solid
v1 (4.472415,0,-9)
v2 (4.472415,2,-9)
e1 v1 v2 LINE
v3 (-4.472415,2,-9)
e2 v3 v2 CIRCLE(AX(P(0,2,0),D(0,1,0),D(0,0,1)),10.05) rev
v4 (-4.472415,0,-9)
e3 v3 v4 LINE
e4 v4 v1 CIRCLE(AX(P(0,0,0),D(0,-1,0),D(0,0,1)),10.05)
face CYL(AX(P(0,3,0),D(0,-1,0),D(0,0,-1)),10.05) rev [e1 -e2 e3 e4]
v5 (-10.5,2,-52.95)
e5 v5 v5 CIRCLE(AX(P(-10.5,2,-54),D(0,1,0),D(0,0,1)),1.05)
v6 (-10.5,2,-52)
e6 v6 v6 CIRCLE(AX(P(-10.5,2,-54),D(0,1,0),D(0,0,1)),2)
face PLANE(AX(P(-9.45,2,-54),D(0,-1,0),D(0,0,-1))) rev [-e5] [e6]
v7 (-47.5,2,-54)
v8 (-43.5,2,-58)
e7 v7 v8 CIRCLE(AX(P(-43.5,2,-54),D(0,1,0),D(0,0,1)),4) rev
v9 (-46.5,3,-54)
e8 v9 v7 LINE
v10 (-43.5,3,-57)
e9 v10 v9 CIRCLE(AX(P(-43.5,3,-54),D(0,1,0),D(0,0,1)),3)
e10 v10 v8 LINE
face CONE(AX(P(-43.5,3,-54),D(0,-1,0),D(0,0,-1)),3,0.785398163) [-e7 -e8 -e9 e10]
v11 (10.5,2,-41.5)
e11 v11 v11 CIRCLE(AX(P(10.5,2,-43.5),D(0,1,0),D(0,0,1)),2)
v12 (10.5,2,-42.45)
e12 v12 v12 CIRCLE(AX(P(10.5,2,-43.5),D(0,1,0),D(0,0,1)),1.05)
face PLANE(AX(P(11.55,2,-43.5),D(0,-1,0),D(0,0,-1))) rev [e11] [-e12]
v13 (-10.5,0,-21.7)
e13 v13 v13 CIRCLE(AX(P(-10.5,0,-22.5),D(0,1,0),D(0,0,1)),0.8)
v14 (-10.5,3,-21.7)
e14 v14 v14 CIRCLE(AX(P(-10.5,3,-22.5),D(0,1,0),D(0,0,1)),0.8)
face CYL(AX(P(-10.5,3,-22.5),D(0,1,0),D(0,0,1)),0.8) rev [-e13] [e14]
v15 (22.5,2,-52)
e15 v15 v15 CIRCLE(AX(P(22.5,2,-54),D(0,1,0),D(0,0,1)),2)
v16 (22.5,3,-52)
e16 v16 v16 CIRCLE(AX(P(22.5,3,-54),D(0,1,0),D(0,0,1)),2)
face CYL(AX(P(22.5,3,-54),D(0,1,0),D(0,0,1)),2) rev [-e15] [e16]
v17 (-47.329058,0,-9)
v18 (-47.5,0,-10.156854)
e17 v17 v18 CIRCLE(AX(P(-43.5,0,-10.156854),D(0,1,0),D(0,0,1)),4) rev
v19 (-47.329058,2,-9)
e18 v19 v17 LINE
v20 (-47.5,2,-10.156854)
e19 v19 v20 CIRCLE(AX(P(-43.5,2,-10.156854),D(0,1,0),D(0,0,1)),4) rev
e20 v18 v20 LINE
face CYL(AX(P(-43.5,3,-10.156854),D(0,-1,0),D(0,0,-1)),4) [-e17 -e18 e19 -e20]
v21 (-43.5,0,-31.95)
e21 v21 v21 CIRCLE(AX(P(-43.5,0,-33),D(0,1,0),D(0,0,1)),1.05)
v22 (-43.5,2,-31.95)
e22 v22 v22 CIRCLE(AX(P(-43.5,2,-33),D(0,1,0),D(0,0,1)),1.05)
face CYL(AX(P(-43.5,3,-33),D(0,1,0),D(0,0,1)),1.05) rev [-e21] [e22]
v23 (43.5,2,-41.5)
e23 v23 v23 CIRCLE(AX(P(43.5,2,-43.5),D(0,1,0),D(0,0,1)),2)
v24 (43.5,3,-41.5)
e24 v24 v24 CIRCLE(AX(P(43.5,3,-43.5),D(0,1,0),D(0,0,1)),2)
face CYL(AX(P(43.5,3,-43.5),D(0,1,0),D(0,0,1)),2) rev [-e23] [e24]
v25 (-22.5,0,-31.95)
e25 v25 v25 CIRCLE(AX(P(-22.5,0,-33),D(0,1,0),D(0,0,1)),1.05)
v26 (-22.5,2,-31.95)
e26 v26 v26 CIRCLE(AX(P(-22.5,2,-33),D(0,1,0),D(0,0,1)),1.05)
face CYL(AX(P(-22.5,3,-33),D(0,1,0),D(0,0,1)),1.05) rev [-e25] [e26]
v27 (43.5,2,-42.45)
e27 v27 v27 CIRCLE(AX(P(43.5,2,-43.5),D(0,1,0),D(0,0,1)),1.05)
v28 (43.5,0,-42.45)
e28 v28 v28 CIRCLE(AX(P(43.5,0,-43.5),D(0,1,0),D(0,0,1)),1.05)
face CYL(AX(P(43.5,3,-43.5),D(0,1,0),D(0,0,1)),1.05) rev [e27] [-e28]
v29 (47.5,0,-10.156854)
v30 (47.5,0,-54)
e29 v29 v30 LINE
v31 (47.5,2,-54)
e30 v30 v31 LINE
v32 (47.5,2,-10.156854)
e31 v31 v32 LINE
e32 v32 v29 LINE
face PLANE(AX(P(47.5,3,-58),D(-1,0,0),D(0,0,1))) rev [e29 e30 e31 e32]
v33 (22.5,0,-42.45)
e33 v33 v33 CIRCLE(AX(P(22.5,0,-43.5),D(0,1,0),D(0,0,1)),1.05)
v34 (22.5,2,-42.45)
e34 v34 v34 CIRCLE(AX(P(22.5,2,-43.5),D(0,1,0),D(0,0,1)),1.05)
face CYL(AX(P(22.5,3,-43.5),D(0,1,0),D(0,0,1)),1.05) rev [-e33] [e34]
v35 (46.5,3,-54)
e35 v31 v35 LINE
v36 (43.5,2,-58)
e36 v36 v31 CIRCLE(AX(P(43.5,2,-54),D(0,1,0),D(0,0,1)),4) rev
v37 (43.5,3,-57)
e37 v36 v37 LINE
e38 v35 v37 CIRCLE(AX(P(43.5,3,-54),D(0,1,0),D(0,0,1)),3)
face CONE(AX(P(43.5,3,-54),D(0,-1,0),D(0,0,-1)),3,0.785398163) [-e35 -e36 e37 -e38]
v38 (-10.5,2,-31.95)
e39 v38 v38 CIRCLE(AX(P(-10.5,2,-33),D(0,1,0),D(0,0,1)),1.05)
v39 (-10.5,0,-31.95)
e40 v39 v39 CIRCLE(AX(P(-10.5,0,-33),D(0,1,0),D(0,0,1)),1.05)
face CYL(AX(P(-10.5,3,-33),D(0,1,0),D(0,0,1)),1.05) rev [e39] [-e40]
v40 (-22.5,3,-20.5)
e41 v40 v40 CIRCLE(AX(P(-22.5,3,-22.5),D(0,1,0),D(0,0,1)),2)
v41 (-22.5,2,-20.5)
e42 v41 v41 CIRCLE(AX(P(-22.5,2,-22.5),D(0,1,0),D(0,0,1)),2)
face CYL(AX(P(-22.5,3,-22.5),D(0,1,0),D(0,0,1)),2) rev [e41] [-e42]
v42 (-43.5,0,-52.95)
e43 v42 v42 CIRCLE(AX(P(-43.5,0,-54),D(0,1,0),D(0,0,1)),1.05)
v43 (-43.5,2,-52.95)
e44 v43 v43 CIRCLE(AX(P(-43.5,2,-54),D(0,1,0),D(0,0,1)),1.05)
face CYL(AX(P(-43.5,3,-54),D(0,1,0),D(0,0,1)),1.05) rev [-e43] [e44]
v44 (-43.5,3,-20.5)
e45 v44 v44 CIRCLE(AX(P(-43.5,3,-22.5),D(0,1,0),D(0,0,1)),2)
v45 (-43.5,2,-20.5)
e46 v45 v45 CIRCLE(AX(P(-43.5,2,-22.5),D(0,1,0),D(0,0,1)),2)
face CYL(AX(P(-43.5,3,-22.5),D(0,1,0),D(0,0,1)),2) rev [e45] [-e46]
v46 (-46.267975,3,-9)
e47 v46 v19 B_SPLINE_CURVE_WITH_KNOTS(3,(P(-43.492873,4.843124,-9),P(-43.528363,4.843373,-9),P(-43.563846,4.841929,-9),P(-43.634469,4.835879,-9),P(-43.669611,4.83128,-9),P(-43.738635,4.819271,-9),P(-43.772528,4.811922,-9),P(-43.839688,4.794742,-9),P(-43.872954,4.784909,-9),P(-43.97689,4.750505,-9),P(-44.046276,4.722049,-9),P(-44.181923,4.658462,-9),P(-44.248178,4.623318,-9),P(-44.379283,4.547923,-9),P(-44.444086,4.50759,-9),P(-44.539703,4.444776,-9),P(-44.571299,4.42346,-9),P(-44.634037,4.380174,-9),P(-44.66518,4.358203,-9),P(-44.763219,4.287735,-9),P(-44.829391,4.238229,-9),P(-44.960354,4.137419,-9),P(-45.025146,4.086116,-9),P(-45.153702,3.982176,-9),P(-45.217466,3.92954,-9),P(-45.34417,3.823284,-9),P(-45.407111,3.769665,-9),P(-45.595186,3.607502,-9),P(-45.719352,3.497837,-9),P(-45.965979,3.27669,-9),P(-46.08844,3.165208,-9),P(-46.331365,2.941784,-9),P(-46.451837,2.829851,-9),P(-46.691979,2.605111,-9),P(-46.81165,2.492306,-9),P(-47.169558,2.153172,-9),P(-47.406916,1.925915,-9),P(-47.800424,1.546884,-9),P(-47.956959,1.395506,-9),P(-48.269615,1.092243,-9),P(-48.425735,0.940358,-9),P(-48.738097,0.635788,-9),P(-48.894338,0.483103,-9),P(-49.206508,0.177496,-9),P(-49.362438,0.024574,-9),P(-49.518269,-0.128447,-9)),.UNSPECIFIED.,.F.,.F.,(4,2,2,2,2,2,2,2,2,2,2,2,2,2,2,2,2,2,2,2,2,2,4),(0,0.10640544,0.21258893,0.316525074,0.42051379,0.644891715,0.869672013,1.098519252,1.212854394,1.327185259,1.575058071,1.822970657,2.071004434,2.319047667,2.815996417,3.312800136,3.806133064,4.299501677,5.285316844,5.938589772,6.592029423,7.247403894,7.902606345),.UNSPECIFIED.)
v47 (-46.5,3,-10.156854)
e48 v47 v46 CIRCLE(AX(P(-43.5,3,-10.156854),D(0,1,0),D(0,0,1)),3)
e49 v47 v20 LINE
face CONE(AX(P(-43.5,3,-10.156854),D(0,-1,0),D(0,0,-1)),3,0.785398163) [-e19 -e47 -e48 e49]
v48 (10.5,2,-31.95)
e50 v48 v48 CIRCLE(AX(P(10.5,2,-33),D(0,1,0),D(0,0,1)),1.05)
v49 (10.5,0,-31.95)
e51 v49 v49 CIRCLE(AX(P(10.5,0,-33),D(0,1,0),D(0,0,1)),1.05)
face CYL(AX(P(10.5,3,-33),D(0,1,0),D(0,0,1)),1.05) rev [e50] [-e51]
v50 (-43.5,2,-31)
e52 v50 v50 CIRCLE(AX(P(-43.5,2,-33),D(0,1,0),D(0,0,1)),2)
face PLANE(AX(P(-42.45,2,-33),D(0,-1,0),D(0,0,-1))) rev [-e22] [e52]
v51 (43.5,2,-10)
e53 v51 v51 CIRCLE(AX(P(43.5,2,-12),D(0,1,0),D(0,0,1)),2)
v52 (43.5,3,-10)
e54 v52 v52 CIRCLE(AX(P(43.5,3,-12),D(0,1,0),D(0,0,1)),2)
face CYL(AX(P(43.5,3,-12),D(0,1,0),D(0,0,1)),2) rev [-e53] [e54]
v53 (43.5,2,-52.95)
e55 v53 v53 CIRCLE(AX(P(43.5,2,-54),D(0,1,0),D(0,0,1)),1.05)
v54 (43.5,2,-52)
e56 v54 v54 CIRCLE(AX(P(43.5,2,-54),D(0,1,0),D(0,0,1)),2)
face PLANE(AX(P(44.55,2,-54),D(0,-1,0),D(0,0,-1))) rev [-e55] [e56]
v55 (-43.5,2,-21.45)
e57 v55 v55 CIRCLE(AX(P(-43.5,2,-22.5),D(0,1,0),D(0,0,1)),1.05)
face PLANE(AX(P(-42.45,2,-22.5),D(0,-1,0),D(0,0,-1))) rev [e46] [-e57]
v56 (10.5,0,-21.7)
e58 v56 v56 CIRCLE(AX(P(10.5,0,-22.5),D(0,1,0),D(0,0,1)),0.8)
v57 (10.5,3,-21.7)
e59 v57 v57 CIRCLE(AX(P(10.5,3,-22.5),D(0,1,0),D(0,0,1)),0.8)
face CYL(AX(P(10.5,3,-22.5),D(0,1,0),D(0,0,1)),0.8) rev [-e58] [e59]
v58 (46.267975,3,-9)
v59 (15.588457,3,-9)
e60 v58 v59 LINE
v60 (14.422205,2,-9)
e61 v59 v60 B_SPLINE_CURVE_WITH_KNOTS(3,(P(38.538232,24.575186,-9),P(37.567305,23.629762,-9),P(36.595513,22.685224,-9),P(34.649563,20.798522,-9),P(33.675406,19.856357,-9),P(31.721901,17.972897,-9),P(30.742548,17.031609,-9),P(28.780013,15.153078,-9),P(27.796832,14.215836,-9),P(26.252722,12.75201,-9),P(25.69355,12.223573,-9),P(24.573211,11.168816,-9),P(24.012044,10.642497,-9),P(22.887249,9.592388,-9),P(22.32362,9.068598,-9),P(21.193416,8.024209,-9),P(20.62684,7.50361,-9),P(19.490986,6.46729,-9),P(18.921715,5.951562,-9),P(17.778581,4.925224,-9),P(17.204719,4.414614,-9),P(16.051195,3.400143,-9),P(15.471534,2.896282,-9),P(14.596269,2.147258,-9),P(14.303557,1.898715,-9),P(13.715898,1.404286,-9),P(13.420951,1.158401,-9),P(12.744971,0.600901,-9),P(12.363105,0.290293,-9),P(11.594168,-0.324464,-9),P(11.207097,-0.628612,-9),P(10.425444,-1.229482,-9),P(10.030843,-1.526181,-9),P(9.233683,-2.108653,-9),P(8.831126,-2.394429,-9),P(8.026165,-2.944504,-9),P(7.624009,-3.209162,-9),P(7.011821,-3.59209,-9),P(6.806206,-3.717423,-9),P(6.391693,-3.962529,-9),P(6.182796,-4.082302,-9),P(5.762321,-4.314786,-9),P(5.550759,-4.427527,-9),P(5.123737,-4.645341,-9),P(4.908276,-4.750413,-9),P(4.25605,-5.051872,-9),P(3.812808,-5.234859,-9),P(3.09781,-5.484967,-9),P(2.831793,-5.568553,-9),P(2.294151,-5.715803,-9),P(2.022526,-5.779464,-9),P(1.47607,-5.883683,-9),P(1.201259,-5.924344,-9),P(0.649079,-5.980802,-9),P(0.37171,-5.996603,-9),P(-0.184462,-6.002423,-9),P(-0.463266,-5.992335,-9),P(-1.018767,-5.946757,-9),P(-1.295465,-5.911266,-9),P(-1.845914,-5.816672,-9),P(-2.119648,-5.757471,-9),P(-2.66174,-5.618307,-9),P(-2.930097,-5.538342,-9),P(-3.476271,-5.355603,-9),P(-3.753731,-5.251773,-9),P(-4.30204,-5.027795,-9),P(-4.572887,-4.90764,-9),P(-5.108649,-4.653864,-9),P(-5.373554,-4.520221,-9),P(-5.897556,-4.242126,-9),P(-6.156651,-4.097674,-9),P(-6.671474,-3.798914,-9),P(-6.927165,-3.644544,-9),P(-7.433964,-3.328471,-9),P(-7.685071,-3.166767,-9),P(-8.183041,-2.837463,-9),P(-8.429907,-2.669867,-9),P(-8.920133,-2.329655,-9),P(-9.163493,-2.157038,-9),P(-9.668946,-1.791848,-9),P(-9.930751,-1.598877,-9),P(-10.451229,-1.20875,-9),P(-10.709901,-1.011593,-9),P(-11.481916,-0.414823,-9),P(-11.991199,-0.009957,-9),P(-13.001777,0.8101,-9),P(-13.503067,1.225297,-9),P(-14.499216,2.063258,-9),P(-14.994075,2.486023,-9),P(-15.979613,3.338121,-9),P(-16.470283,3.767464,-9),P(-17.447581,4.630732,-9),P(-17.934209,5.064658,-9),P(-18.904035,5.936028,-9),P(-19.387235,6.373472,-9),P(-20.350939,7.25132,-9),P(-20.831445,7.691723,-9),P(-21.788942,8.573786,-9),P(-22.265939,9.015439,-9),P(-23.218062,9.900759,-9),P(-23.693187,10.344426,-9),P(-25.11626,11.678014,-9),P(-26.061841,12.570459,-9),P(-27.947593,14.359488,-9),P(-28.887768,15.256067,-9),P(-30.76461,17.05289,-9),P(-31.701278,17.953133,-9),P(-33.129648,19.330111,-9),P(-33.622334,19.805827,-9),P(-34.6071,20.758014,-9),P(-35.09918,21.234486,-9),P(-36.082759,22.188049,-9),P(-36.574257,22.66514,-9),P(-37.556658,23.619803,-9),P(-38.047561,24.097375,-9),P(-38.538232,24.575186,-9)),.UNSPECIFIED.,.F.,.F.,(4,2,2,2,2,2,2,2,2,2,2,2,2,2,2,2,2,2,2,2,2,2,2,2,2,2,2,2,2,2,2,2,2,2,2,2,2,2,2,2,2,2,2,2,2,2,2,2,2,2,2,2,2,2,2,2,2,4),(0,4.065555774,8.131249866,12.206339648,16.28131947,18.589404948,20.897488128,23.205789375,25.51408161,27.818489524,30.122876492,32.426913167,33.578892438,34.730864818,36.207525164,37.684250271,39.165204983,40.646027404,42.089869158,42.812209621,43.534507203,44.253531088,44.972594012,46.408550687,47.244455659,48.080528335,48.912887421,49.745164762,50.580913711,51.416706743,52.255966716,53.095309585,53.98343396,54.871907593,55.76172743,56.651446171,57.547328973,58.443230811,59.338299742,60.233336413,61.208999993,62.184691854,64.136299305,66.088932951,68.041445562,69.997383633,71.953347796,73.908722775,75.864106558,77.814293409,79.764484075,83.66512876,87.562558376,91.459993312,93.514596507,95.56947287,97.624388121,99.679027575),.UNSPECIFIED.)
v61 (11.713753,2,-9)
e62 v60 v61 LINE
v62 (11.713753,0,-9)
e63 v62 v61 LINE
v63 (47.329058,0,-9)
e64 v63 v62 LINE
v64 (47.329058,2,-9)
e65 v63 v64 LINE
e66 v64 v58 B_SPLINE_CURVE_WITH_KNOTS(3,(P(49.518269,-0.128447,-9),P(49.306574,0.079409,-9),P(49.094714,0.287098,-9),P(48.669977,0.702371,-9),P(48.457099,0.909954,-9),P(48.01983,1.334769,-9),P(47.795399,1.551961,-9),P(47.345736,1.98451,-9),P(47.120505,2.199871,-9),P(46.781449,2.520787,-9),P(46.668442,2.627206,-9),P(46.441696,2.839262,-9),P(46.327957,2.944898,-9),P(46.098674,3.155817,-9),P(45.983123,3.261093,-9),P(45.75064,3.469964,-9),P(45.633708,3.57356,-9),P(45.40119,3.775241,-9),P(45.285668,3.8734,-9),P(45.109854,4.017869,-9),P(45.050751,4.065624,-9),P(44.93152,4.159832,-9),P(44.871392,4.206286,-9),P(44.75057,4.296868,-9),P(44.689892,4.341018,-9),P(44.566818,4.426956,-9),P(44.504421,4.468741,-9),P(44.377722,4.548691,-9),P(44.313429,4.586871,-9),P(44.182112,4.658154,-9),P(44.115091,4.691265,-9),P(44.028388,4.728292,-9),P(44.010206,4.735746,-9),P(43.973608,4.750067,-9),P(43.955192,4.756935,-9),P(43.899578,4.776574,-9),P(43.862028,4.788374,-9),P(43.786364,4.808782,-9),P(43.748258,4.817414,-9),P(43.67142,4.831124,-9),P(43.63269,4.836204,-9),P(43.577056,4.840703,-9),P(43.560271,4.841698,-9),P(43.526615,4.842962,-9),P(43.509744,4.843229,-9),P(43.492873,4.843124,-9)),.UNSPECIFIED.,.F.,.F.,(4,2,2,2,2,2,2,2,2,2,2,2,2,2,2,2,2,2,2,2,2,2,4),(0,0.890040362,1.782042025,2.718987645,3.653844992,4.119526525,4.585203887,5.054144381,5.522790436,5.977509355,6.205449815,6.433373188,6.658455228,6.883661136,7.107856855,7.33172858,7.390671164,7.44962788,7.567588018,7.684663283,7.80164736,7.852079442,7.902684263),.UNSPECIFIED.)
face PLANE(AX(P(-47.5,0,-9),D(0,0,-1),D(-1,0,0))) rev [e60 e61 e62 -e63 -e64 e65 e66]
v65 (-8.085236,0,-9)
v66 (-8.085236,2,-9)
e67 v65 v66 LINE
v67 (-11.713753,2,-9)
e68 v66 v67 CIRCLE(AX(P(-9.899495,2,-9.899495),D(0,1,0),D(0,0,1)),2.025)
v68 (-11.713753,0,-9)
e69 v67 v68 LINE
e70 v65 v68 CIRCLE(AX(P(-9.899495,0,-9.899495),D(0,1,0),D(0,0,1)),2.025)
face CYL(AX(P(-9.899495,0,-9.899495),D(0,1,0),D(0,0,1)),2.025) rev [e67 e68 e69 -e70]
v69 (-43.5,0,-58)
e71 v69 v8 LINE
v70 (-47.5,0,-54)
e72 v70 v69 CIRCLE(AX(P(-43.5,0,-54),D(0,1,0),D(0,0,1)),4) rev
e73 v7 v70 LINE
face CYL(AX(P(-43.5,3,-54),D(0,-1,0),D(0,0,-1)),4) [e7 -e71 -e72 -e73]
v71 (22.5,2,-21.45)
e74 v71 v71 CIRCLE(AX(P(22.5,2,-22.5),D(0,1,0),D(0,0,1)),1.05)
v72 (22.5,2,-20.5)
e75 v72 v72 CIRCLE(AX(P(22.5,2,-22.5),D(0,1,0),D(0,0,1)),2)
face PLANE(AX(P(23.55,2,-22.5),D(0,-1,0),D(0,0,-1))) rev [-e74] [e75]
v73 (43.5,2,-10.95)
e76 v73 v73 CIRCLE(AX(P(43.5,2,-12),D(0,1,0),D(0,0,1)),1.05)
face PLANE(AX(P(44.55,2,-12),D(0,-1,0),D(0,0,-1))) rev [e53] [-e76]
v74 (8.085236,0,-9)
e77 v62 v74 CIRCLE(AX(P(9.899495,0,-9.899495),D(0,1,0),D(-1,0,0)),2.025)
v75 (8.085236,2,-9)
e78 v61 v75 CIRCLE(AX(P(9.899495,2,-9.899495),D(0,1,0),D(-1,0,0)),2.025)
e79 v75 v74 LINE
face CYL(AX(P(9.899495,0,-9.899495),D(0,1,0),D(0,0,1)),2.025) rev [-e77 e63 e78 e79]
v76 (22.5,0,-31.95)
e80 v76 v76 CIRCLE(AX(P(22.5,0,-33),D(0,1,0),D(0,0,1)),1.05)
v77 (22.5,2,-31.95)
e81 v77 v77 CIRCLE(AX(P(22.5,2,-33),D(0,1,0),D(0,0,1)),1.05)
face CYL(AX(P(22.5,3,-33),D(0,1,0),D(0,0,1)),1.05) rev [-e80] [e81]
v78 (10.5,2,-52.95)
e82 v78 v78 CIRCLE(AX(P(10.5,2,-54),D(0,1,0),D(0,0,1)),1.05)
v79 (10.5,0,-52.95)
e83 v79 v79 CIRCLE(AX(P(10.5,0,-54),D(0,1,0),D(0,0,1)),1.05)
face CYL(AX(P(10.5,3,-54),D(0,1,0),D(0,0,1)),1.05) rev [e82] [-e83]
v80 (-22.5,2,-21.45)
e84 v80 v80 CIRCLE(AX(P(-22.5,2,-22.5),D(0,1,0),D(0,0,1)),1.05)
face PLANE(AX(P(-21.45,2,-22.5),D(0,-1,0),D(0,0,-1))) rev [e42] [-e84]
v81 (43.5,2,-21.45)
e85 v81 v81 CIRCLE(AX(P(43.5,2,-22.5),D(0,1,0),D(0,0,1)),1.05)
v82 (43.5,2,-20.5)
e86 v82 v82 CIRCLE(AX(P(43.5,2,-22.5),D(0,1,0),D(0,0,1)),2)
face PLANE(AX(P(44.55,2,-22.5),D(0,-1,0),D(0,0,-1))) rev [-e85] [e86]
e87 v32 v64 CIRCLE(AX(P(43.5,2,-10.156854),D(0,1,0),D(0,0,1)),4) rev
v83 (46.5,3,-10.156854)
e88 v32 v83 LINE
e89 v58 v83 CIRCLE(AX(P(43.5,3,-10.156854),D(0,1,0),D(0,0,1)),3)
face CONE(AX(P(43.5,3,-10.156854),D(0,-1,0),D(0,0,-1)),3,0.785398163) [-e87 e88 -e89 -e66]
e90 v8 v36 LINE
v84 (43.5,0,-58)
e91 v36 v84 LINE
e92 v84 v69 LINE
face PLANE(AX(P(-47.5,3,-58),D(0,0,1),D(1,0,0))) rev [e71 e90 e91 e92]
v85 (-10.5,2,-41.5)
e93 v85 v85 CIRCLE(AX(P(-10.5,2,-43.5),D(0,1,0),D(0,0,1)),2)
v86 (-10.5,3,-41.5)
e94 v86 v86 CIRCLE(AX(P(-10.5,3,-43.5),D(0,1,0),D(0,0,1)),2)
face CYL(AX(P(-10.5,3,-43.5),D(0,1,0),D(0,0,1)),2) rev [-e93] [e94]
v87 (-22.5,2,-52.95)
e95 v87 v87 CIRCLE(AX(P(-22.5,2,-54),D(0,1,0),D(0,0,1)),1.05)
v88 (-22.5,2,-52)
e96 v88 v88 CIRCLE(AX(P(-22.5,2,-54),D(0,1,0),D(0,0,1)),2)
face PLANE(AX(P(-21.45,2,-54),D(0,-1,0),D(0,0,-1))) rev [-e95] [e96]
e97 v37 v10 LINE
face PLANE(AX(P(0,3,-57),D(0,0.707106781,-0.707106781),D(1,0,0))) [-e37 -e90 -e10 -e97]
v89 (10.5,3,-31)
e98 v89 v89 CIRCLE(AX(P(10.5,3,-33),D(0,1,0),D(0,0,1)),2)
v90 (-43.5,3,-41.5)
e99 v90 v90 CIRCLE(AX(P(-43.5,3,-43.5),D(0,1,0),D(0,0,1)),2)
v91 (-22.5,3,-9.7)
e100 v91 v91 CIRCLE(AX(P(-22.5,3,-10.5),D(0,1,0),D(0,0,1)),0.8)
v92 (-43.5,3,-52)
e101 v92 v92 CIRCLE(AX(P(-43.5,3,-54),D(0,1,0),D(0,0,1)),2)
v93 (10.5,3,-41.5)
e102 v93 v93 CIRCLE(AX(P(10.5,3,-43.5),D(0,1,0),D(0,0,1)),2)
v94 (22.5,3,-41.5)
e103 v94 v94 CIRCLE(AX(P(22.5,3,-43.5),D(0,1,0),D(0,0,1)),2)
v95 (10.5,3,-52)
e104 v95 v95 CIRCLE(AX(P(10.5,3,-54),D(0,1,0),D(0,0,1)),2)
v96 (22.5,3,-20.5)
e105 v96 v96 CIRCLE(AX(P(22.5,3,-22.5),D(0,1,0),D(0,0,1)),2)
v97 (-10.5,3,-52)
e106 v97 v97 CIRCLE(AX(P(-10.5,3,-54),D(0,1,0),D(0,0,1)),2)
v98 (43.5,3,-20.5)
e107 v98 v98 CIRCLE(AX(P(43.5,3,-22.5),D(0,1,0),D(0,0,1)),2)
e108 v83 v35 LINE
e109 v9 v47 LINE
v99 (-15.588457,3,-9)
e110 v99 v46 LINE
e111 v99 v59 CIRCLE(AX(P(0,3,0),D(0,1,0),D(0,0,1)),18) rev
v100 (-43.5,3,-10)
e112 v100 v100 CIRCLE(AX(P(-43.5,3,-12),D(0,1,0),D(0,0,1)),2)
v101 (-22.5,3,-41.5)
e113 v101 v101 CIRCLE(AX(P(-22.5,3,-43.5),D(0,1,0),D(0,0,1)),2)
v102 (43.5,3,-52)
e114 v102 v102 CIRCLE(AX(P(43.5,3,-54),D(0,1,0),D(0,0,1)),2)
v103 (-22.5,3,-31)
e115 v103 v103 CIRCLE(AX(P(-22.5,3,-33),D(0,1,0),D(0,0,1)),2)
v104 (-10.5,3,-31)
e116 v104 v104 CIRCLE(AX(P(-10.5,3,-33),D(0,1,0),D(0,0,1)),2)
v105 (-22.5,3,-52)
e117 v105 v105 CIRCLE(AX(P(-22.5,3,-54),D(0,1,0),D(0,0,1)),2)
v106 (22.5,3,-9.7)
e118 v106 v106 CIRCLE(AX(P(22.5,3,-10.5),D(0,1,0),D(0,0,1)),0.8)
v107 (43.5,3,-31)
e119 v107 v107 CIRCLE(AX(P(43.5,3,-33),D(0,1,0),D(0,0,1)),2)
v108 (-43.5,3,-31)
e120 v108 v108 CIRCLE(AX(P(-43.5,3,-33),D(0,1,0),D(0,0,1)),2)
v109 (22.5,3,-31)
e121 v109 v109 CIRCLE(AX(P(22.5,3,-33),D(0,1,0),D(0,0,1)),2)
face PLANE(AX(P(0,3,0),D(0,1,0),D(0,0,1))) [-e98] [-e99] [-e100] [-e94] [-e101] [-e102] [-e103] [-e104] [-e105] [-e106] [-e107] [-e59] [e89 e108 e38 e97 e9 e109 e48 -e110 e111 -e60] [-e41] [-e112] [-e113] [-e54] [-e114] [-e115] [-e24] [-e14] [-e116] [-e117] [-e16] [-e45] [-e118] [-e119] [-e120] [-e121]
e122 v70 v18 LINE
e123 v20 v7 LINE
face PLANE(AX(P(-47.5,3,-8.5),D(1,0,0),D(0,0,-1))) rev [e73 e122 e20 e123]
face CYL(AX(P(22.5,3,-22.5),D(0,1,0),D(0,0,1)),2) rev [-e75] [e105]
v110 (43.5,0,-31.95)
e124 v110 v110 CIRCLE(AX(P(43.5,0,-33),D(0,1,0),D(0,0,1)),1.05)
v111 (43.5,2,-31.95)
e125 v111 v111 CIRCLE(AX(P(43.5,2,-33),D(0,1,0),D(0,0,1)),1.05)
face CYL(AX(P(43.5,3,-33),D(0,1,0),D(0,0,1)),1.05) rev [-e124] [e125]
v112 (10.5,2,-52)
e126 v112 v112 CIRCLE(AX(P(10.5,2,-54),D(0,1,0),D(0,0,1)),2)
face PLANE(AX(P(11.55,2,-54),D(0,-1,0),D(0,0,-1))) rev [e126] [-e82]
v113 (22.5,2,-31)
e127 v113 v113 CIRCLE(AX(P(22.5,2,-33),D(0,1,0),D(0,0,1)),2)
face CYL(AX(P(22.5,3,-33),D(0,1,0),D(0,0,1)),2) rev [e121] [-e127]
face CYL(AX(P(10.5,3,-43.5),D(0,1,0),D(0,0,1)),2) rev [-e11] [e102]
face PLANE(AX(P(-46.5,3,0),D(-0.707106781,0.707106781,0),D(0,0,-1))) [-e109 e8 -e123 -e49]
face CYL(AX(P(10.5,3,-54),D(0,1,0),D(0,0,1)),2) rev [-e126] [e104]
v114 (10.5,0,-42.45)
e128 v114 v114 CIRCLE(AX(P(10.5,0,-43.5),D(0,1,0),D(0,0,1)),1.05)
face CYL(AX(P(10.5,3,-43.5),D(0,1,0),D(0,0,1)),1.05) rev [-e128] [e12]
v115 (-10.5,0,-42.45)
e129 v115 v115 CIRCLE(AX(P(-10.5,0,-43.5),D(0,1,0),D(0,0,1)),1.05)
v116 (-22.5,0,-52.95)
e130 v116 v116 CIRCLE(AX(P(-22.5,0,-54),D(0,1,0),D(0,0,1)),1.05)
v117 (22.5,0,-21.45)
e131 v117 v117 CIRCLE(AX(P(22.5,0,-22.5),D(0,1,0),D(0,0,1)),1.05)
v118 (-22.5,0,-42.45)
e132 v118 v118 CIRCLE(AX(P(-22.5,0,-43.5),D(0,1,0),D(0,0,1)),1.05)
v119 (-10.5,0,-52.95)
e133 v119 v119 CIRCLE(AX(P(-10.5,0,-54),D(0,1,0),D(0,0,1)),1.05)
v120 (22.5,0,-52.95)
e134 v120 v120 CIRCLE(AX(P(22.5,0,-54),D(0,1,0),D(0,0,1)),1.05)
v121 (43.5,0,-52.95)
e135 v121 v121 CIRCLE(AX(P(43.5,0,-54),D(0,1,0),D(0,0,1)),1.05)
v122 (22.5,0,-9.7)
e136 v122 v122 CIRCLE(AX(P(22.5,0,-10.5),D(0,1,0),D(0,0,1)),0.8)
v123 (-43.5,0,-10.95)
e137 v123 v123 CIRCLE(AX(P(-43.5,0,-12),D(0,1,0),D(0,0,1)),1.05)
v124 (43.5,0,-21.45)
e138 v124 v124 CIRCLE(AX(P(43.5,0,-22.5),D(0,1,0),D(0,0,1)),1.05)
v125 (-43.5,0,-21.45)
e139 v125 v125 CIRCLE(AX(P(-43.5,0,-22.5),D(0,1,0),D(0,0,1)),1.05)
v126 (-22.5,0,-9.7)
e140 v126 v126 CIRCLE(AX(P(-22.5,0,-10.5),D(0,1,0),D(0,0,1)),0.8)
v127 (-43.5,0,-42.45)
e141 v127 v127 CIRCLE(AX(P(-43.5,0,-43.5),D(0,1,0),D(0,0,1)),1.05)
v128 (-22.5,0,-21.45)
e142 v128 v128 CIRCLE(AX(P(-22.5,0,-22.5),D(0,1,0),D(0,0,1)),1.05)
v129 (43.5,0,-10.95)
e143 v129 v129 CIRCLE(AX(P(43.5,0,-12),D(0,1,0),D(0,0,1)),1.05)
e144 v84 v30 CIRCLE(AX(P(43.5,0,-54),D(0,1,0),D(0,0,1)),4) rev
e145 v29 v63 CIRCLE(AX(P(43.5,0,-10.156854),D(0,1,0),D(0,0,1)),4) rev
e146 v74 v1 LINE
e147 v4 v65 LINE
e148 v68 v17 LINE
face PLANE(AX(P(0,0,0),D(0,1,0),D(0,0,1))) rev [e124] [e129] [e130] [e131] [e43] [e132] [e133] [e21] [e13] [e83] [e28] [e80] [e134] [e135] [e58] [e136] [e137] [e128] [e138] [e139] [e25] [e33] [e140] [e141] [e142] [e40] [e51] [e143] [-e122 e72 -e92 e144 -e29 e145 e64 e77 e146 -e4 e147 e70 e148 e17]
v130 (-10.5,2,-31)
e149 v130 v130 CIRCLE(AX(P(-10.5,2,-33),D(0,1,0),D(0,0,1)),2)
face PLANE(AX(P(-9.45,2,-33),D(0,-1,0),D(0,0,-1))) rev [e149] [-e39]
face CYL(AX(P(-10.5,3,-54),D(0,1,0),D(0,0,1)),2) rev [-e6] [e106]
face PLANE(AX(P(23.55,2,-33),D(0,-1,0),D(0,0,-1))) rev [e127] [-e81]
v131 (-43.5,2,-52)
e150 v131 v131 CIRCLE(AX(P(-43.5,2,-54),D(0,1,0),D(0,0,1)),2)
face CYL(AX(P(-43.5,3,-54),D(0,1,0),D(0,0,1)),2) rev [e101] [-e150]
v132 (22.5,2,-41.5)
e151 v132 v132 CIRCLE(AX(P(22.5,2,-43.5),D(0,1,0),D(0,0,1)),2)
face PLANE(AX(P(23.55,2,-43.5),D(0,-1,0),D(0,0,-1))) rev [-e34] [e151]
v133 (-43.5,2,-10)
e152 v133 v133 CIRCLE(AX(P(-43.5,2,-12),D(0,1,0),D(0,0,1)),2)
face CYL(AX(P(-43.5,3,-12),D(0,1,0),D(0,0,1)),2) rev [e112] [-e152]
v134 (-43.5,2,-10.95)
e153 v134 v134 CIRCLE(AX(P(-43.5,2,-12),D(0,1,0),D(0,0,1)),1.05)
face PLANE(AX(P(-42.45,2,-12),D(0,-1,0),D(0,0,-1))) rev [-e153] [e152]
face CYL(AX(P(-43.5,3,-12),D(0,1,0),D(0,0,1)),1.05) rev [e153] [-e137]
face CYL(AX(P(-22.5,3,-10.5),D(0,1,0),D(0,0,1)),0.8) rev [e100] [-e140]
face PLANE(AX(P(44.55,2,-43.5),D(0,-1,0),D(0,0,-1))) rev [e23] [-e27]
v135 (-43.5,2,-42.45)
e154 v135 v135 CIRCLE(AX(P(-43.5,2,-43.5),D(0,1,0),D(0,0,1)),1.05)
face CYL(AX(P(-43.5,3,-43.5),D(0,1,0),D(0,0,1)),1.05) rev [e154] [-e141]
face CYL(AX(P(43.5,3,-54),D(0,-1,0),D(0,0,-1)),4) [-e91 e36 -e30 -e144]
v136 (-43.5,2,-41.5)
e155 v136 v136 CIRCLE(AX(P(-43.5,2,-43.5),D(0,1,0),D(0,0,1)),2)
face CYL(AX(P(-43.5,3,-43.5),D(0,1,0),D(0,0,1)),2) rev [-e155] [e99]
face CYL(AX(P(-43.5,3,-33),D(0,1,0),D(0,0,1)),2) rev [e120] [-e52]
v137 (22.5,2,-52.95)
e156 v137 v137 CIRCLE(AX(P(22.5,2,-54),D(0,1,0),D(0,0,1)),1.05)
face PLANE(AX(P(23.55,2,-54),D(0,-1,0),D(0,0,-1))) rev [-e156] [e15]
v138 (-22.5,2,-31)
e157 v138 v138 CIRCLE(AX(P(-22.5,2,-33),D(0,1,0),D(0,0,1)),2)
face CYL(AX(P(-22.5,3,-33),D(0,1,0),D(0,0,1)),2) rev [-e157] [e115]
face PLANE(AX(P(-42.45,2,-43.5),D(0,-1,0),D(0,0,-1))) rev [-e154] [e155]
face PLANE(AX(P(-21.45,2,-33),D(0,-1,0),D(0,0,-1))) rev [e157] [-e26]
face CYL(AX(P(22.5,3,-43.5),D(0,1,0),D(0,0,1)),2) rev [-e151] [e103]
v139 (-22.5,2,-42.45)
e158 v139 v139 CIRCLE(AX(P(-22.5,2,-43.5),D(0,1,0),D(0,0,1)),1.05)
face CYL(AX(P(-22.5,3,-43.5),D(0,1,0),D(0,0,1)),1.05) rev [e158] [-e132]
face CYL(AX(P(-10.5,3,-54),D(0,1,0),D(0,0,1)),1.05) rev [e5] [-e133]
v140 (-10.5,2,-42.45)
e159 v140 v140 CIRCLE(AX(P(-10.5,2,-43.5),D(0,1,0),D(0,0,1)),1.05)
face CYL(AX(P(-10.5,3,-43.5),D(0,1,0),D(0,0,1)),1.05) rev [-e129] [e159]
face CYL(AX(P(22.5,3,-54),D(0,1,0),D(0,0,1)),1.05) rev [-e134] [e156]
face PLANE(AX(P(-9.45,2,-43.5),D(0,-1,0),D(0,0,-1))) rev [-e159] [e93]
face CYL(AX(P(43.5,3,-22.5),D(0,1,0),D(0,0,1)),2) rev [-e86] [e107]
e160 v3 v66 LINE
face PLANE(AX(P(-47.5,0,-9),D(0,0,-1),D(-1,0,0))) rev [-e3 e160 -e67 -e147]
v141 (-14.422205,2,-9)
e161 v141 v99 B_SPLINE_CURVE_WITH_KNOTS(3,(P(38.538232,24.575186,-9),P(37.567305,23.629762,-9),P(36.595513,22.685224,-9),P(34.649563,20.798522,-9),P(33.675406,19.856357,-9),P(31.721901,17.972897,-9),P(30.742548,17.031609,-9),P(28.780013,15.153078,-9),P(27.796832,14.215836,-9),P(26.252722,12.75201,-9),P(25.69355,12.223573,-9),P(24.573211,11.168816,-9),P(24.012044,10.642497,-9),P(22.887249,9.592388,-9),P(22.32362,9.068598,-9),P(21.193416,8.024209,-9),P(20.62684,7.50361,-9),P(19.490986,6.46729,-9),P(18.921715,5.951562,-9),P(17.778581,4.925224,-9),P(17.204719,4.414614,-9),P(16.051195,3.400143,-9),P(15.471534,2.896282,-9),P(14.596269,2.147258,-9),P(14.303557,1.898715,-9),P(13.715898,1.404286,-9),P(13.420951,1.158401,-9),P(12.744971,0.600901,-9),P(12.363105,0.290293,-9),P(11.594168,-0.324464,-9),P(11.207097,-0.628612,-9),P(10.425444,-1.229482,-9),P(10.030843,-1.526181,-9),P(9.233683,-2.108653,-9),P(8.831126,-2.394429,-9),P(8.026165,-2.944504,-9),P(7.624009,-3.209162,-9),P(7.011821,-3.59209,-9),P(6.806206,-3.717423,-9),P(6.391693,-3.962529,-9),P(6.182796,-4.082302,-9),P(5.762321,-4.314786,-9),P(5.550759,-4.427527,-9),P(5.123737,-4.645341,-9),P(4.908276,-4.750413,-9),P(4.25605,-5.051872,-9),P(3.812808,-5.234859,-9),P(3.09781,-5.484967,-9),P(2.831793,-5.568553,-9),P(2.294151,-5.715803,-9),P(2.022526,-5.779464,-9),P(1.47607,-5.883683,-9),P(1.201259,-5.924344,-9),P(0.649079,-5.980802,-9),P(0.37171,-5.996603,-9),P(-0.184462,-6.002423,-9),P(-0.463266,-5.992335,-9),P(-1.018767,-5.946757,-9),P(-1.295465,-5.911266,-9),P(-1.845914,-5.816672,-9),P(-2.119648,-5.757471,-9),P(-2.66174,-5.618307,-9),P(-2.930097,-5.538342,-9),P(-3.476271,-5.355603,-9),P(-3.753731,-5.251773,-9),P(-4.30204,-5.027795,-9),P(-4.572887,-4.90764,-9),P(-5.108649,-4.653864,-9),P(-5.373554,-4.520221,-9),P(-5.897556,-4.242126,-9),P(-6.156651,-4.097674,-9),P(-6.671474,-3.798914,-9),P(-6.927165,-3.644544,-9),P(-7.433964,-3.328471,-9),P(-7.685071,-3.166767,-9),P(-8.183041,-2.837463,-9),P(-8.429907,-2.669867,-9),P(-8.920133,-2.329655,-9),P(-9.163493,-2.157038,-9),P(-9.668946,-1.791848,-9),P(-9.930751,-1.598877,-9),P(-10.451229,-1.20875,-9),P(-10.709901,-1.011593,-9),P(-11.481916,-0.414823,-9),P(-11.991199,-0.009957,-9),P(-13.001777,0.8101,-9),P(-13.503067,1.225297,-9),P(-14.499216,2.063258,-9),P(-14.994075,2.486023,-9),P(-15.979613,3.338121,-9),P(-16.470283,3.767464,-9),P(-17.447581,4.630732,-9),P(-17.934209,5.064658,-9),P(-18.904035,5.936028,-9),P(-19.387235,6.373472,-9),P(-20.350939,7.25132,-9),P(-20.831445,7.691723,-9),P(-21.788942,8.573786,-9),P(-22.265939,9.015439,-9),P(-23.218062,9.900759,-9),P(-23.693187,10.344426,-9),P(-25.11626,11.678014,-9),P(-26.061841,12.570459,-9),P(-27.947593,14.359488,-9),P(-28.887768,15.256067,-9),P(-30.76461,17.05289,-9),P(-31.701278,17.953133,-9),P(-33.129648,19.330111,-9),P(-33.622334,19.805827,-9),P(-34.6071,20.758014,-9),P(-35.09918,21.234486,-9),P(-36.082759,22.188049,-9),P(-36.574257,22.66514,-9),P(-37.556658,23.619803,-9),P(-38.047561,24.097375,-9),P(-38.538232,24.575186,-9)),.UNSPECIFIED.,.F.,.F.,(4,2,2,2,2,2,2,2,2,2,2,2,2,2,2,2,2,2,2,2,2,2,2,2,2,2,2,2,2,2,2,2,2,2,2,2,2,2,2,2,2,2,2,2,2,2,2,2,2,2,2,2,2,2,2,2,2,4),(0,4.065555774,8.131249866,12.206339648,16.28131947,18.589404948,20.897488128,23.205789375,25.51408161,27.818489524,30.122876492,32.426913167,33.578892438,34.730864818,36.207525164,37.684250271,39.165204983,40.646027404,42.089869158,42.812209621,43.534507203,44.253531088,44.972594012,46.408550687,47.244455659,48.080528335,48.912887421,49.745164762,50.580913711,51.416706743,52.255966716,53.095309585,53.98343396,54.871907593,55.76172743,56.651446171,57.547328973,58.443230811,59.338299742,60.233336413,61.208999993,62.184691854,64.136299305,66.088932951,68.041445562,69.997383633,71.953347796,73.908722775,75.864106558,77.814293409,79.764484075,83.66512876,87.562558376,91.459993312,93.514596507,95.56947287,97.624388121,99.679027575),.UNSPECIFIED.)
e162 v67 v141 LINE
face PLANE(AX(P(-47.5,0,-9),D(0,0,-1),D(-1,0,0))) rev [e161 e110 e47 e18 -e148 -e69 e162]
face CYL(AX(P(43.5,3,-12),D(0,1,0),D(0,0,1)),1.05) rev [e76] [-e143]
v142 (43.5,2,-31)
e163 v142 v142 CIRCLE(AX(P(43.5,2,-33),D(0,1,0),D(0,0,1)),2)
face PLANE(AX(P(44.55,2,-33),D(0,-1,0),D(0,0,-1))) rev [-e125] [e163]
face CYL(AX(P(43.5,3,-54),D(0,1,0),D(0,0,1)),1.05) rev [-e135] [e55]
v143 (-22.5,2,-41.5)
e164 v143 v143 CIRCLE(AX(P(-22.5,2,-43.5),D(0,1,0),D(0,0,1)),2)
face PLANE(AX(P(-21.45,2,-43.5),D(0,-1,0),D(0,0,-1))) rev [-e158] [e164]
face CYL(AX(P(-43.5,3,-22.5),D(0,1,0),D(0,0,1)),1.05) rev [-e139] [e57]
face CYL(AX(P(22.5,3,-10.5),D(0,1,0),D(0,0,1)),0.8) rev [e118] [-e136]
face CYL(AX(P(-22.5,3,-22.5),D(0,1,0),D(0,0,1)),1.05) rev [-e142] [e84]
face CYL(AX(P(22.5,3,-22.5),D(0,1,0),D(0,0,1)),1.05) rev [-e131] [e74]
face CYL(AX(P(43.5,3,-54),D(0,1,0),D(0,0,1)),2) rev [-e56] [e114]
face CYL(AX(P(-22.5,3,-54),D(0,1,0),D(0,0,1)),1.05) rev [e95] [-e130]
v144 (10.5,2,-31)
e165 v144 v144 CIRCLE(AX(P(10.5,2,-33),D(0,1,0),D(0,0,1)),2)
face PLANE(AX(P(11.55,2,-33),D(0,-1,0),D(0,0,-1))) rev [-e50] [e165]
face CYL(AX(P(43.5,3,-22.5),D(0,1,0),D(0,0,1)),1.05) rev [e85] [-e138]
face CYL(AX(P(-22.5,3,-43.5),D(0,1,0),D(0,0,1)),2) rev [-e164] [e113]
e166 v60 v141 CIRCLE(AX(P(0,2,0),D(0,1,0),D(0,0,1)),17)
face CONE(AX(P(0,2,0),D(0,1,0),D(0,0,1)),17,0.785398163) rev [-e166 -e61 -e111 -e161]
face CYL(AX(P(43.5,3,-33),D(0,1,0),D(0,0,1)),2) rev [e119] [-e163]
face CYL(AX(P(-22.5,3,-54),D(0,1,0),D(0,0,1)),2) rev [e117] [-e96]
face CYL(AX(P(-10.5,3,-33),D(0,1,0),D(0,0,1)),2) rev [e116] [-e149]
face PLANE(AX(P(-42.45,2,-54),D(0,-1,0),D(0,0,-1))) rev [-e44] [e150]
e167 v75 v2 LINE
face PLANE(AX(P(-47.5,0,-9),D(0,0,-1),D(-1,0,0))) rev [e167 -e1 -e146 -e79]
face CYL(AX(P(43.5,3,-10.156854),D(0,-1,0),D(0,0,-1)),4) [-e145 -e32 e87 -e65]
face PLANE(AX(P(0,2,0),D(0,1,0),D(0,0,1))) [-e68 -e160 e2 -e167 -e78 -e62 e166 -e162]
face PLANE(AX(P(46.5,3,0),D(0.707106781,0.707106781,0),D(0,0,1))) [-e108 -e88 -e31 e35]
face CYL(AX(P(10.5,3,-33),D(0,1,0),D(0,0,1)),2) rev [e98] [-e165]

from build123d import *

# Parameters (mm, degrees)
EXTRUDE_1_DEPTH               = 3
HOLE_WIZARD_M2_1_AT_2_COUNT   = 2
HOLE_WIZARD_M2_1_AT_2_PITCH   = 21
PATTERN_LINEAR_1_COUNT        = 3
PATTERN_LINEAR_1_PITCH        = 33
PATTERN_LINEAR_2_COUNT        = 3
PATTERN_LINEAR_2_PITCH        = 10.5
PATTERN_LINEAR_3_COUNT        = 2
PATTERN_LINEAR_3_PITCH        = 31.5
HOLE_WIZARD_M2_1_2_AT_2_COUNT = 2
HOLE_WIZARD_M2_1_2_AT_2_PITCH = 16.970562748
SKETCH_8_R                    = 17
CUT_EXTRUDE_1_DEPTH           = 1
SKETCH_9_R                    = 2.025
CUT_EXTRUDE_2_DEPTH           = 75.994999833
PATTERN_CIRCULAR_1_COUNT      = 2
PATTERN_CIRCULAR_1_ANGLE      = 90
FILLET_1_R                    = 4
CHAMFER_1_SIZE                = 1
SKETCH_11_W                   = 95
SKETCH_11_H                   = 18
CUT_EXTRUDE_3_DEPTH           = 76.028327984


with BuildPart() as part:
    # ｽｹｯﾁ1 → ﾎﾞｽ - 押し出し1 (new body)
    with BuildSketch(Plane(origin=(0, 0, 0), x_dir=(1, 0, 0), z_dir=(0, 1, 0))):
        with BuildLine():
            Line((-10.05, 0), (-39, 0))
            Line((-39, 0), (-47.5, 8.5))
            Line((-47.5, 8.5), (-47.5, 58))
            Line((-47.5, 58), (47.5, 58))
            Line((47.5, 58), (47.5, 8.5))
            Line((47.5, 8.5), (39, 0))
            Line((39, 0), (10.05, 0))
            ThreePointArc((10.05, 0), (0, 10.05), (-10.05, 0))
        make_face()
    extrude(amount=EXTRUDE_1_DEPTH)

    # ｽｹｯﾁ3 → Hole Wizard M2 _1 (revolve, cut)
    with BuildSketch(Plane(origin=(-43.5, 3, -54), x_dir=(0, 0, 1), z_dir=(1, 0, 0))):
        Polygon((0, 0), (0, 4.63090365), (1.05, 4), (1.05, 1), (2, 1), (2, 0), align=None)
    hole_wizard_m2_1 = revolve(axis=Axis((-43.5, 9.35, -54), (0, -1, 0)), mode=Mode.SUBTRACT)

    # Hole Wizard M2 _1 at 2: Hole Wizard M2 _1 ×2
    with Locations(*[(i * HOLE_WIZARD_M2_1_AT_2_PITCH, 0, 0) for i in range(1, HOLE_WIZARD_M2_1_AT_2_COUNT)]):
        add(hole_wizard_m2_1, mode=Mode.SUBTRACT)

    # 直線ﾊﾟﾀｰﾝ1: Hole Wizard M2 _1 ×3
    with Locations(*[(i * PATTERN_LINEAR_1_PITCH, 0, 0) for i in range(1, PATTERN_LINEAR_1_COUNT)]):
        add(hole_wizard_m2_1, mode=Mode.SUBTRACT)

    # 直線ﾊﾟﾀｰﾝ1 copy 1 sketch → 直線ﾊﾟﾀｰﾝ1 copy 1 (revolve, cut)
    with BuildSketch(Plane(origin=(10.5, 3, -54), x_dir=(0, 0, 1), z_dir=(1, 0, 0))):
        Polygon((0, 0), (0, 4.63090365), (1.05, 4), (1.05, 1), (2, 1), (2, 0), align=None)
    revolve(axis=Axis((10.5, 9.35, -54), (0, -1, 0)), mode=Mode.SUBTRACT)

    # 直線ﾊﾟﾀｰﾝ1 copy 2 sketch → 直線ﾊﾟﾀｰﾝ1 copy 2 (revolve, cut)
    with BuildSketch(Plane(origin=(43.5, 3, -54), x_dir=(0, 0, 1), z_dir=(1, 0, 0))):
        Polygon((0, 0), (0, 4.63090365), (1.05, 4), (1.05, 1), (2, 1), (2, 0), align=None)
    revolve(axis=Axis((43.5, 9.35, -54), (0, -1, 0)), mode=Mode.SUBTRACT)

    # 直線ﾊﾟﾀｰﾝ2: Hole Wizard M2 _1 ×3
    with Locations(*[(0, 0, i * PATTERN_LINEAR_2_PITCH) for i in range(1, PATTERN_LINEAR_2_COUNT)]):
        add(hole_wizard_m2_1, mode=Mode.SUBTRACT)

    # 直線ﾊﾟﾀｰﾝ2 copy 1 sketch → 直線ﾊﾟﾀｰﾝ2 copy 1 (revolve, cut)
    with BuildSketch(Plane(origin=(-22.5, 3, -43.5), x_dir=(0, 0, 1), z_dir=(1, 0, 0))):
        Polygon((0, 0), (0, 4.63090365), (1.05, 4), (1.05, 1), (2, 1), (2, 0), align=None)
    revolve(axis=Axis((-22.5, 9.35, -43.5), (0, -1, 0)), mode=Mode.SUBTRACT)

    # 直線ﾊﾟﾀｰﾝ2 copy 2 sketch → 直線ﾊﾟﾀｰﾝ2 copy 2 (revolve, cut)
    with BuildSketch(Plane(origin=(-22.5, 3, -33), x_dir=(0, 0, 1), z_dir=(1, 0, 0))):
        Polygon((0, 0), (0, 4.63090365), (1.05, 4), (1.05, 1), (2, 1), (2, 0), align=None)
    revolve(axis=Axis((-22.5, 9.35, -33), (0, -1, 0)), mode=Mode.SUBTRACT)

    # 直線ﾊﾟﾀｰﾝ2 copy 3 sketch → 直線ﾊﾟﾀｰﾝ2 copy 3 (revolve, cut)
    with BuildSketch(Plane(origin=(-10.5, 3, -43.5), x_dir=(0, 0, 1), z_dir=(1, 0, 0))):
        Polygon((0, 0), (0, 4.63090365), (1.05, 4), (1.05, 1), (2, 1), (2, 0), align=None)
    revolve(axis=Axis((-10.5, 9.35, -43.5), (0, -1, 0)), mode=Mode.SUBTRACT)

    # 直線ﾊﾟﾀｰﾝ2 copy 4 sketch → 直線ﾊﾟﾀｰﾝ2 copy 4 (revolve, cut)
    with BuildSketch(Plane(origin=(-10.5, 3, -33), x_dir=(0, 0, 1), z_dir=(1, 0, 0))):
        Polygon((0, 0), (0, 4.63090365), (1.05, 4), (1.05, 1), (2, 1), (2, 0), align=None)
    revolve(axis=Axis((-10.5, 9.35, -33), (0, -1, 0)), mode=Mode.SUBTRACT)

    # 直線ﾊﾟﾀｰﾝ2 copy 5 sketch → 直線ﾊﾟﾀｰﾝ2 copy 5 (revolve, cut)
    with BuildSketch(Plane(origin=(22.5, 3, -43.5), x_dir=(0, 0, 1), z_dir=(1, 0, 0))):
        Polygon((0, 0), (0, 4.63090365), (1.05, 4), (1.05, 1), (2, 1), (2, 0), align=None)
    revolve(axis=Axis((22.5, 9.35, -43.5), (0, -1, 0)), mode=Mode.SUBTRACT)

    # 直線ﾊﾟﾀｰﾝ2 copy 6 sketch → 直線ﾊﾟﾀｰﾝ2 copy 6 (revolve, cut)
    with BuildSketch(Plane(origin=(22.5, 3, -33), x_dir=(0, 0, 1), z_dir=(1, 0, 0))):
        Polygon((0, 0), (0, 4.63090365), (1.05, 4), (1.05, 1), (2, 1), (2, 0), align=None)
    revolve(axis=Axis((22.5, 9.35, -33), (0, -1, 0)), mode=Mode.SUBTRACT)

    # 直線ﾊﾟﾀｰﾝ2 copy 7 sketch → 直線ﾊﾟﾀｰﾝ2 copy 7 (revolve, cut)
    with BuildSketch(Plane(origin=(10.5, 3, -43.5), x_dir=(0, 0, 1), z_dir=(1, 0, 0))):
        Polygon((0, 0), (0, 4.63090365), (1.05, 4), (1.05, 1), (2, 1), (2, 0), align=None)
    revolve(axis=Axis((10.5, 9.35, -43.5), (0, -1, 0)), mode=Mode.SUBTRACT)

    # 直線ﾊﾟﾀｰﾝ2 copy 8 sketch → 直線ﾊﾟﾀｰﾝ2 copy 8 (revolve, cut)
    with BuildSketch(Plane(origin=(10.5, 3, -33), x_dir=(0, 0, 1), z_dir=(1, 0, 0))):
        Polygon((0, 0), (0, 4.63090365), (1.05, 4), (1.05, 1), (2, 1), (2, 0), align=None)
    revolve(axis=Axis((10.5, 9.35, -33), (0, -1, 0)), mode=Mode.SUBTRACT)

    # 直線ﾊﾟﾀｰﾝ2 copy 9 sketch → 直線ﾊﾟﾀｰﾝ2 copy 9 (revolve, cut)
    with BuildSketch(Plane(origin=(43.5, 3, -43.5), x_dir=(0, 0, 1), z_dir=(1, 0, 0))):
        Polygon((0, 0), (0, 4.63090365), (1.05, 4), (1.05, 1), (2, 1), (2, 0), align=None)
    revolve(axis=Axis((43.5, 9.35, -43.5), (0, -1, 0)), mode=Mode.SUBTRACT)

    # 直線ﾊﾟﾀｰﾝ2 copy 10 sketch → 直線ﾊﾟﾀｰﾝ2 copy 10 (revolve, cut)
    with BuildSketch(Plane(origin=(43.5, 3, -33), x_dir=(0, 0, 1), z_dir=(1, 0, 0))):
        Polygon((0, 0), (0, 4.63090365), (1.05, 4), (1.05, 1), (2, 1), (2, 0), align=None)
    revolve(axis=Axis((43.5, 9.35, -33), (0, -1, 0)), mode=Mode.SUBTRACT)

    # 直線ﾊﾟﾀｰﾝ3: Hole Wizard M2 _1 ×2
    with Locations(*[(0, 0, i * PATTERN_LINEAR_3_PITCH) for i in range(1, PATTERN_LINEAR_3_COUNT)]):
        add(hole_wizard_m2_1, mode=Mode.SUBTRACT)

    # 直線ﾊﾟﾀｰﾝ3 copy 1 sketch → 直線ﾊﾟﾀｰﾝ3 copy 1 (revolve, cut)
    with BuildSketch(Plane(origin=(-22.5, 3, -22.5), x_dir=(0, 0, 1), z_dir=(1, 0, 0))):
        Polygon((0, 0), (0, 4.63090365), (1.05, 4), (1.05, 1), (2, 1), (2, 0), align=None)
    revolve(axis=Axis((-22.5, 9.35, -22.5), (0, -1, 0)), mode=Mode.SUBTRACT)

    # ｽｹｯﾁ5 → Hole Wizard M2 _1 2 (revolve, cut)
    with BuildSketch(Plane(origin=(-10.5, 3, -22.5), x_dir=(0, 0, 1), z_dir=(1, 0, 0))):
        Polygon((0, 0), (0, 6.480688495), (0.8, 6), (0.8, 0), align=None)
    hole_wizard_m2_1_2 = revolve(axis=Axis((-10.5, 9.35, -22.5), (0, -1, 0)), mode=Mode.SUBTRACT)

    # Hole Wizard M2 _1 2 at 2: Hole Wizard M2 _1 2 ×2
    with Locations(*[Vector(-0.7071067811865469, 0, 0.7071067811865482) * (i * HOLE_WIZARD_M2_1_2_AT_2_PITCH) for i in range(1, HOLE_WIZARD_M2_1_2_AT_2_COUNT)]):
        add(hole_wizard_m2_1_2, mode=Mode.SUBTRACT)

    # ｽｹｯﾁ7 → M2 なべ頭ねじ用座ぐり穴2 (revolve, cut)
    with BuildSketch(Plane(origin=(-43.5, 3, -12), x_dir=(0, 0, 1), z_dir=(1, 0, 0))):
        Polygon((0, 0), (0, 6.63090365), (1.05, 6), (1.05, 1), (2, 1), (2, 0), align=None)
    hole_wizard_m2_2 = revolve(axis=Axis((-43.5, 9.35, -12), (0, -1, 0)), mode=Mode.SUBTRACT)

    # ﾐﾗｰ1: Hole Wizard M2 _1 2, M2 なべ頭ねじ用座ぐり穴2 across plane
    add(hole_wizard_m2_1_2.mirror(Plane(origin=(0, 0, 0), x_dir=(0, 0, 1), z_dir=(1, 0, 0))), mode=Mode.SUBTRACT)
    add(hole_wizard_m2_2.mirror(Plane(origin=(0, 0, 0), x_dir=(0, 0, 1), z_dir=(1, 0, 0))), mode=Mode.SUBTRACT)

    # ﾐﾗｰ1 copy 1 sketch → ﾐﾗｰ1 copy 1 (revolve, cut)
    with BuildSketch(Plane(origin=(43.5, 3, -22.5), x_dir=(0, 0, 1), z_dir=(-1, 0, 0))):
        Polygon((0, 0), (0, -4.63090365), (1.05, -4), (1.05, -1), (2, -1), (2, 0), align=None)
    revolve(axis=Axis((43.5, 9.35, -22.5), (0, 1, 0)), mode=Mode.SUBTRACT)

    # ﾐﾗｰ1 copy 2 sketch → ﾐﾗｰ1 copy 2 (revolve, cut)
    with BuildSketch(Plane(origin=(22.5, 3, -22.5), x_dir=(0, 0, 1), z_dir=(-1, 0, 0))):
        Polygon((0, 0), (0, -4.63090365), (1.05, -4), (1.05, -1), (2, -1), (2, 0), align=None)
    revolve(axis=Axis((22.5, 9.35, -22.5), (0, 1, 0)), mode=Mode.SUBTRACT)

    # ﾐﾗｰ1 copy 3 sketch → ﾐﾗｰ1 copy 3 (revolve, cut)
    with BuildSketch(Plane(origin=(43.5, 3, -54), x_dir=(0, 0, 1), z_dir=(-1, 0, 0))):
        Polygon((0, 0), (0, -4.63090365), (1.05, -4), (1.05, -1), (2, -1), (2, 0), align=None)
    revolve(axis=Axis((43.5, 9.35, -54), (0, 1, 0)), mode=Mode.SUBTRACT)

    # ﾐﾗｰ1 copy 4 sketch → ﾐﾗｰ1 copy 4 (revolve, cut)
    with BuildSketch(Plane(origin=(22.5, 3, -54), x_dir=(0, 0, 1), z_dir=(-1, 0, 0))):
        Polygon((0, 0), (0, -4.63090365), (1.05, -4), (1.05, -1), (2, -1), (2, 0), align=None)
    revolve(axis=Axis((22.5, 9.35, -54), (0, 1, 0)), mode=Mode.SUBTRACT)

    # ﾐﾗｰ1 copy 5 sketch → ﾐﾗｰ1 copy 5 (revolve, cut)
    with BuildSketch(Plane(origin=(22.5, 3, -10.5), x_dir=(0, 0, 1), z_dir=(-1, 0, 0))):
        Polygon((0, 0), (0, -6.480688495), (0.8, -6), (0.8, 0), align=None)
    revolve(axis=Axis((22.5, 9.35, -10.5), (0, 1, 0)), mode=Mode.SUBTRACT)

    # ｽｹｯﾁ8 → ｶｯﾄ - 押し出し1 (cut)
    with BuildSketch(Plane(origin=(0, 3, 0), x_dir=(1, 0, 0), z_dir=(0, 1, 0))):
        Circle(SKETCH_8_R)
    extrude(amount=-CUT_EXTRUDE_1_DEPTH, mode=Mode.SUBTRACT)

    # ｽｹｯﾁ9 → ｶｯﾄ - 押し出し2 (cut, through all)
    with BuildSketch(Plane(origin=(0, 2, 0), x_dir=(1, 0, 0), z_dir=(0, 1, 0))):
        with Locations(Location((-9.899494937, 9.899494937, 0), (0, 0, 270))):
            Circle(SKETCH_9_R)
    cut_extrude_2 = extrude(amount=-CUT_EXTRUDE_2_DEPTH, mode=Mode.SUBTRACT)

    # 円形ﾊﾟﾀｰﾝ1: ｶｯﾄ - 押し出し2 ×2 about axis
    pattern_circular_1_axis = Axis((0, 3, 0), (0, -1, 0))
    for i in range(1, PATTERN_CIRCULAR_1_COUNT):
        add(cut_extrude_2.rotate(pattern_circular_1_axis, i * PATTERN_CIRCULAR_1_ANGLE / (PATTERN_CIRCULAR_1_COUNT - 1)), mode=Mode.SUBTRACT)

    # ﾌｨﾚｯﾄ1
    fillet_1_edges = [part.edges().sort_by_distance(p)[0] for p in [
        (-47.5, 1.5, -8.5),
        (-47.5, 1.5, -58),
        (47.5, 1.5, -58),
        (47.5, 1.5, -8.5),
        (39, 1.5, 0),
        (-39, 1.5, 0),
    ]]
    fillet(fillet_1_edges, radius=FILLET_1_R)

    # 面取り1
    chamfer_1_edges = [part.edges().sort_by_distance(p)[0] for p in [
        (0, 3, -17),
        (27.171572875, 3, 0),
        (38.87387948, 3, -0.30448187),
        (43.25, 3, -4.25),
        (47.19551813, 3, -8.62612052),
        (47.5, 3, -32.078427125),
        (-27.171572875, 3, 0),
        (46.328427125, 3, -56.828427125),
        (-38.87387948, 3, -0.30448187),
        (0, 3, -58),
        (-43.25, 3, -4.25),
        (-46.328427125, 3, -56.828427125),
        (-47.19551813, 3, -8.62612052),
        (-47.5, 3, -32.078427125),
    ]]
    chamfer(chamfer_1_edges, length=CHAMFER_1_SIZE - 0.0001)  # a hair under: the kernel refuses the full size

    # ｽｹｯﾁ11 → ｶｯﾄ - 押し出し3 (cut, through all)
    with BuildSketch(Plane(origin=(0, 3, 0), x_dir=(1, 0, 0), z_dir=(0, 1, 0))):
        Rectangle(SKETCH_11_W, SKETCH_11_H)
    extrude(amount=-CUT_EXTRUDE_3_DEPTH, mode=Mode.SUBTRACT)


solid = part.part
